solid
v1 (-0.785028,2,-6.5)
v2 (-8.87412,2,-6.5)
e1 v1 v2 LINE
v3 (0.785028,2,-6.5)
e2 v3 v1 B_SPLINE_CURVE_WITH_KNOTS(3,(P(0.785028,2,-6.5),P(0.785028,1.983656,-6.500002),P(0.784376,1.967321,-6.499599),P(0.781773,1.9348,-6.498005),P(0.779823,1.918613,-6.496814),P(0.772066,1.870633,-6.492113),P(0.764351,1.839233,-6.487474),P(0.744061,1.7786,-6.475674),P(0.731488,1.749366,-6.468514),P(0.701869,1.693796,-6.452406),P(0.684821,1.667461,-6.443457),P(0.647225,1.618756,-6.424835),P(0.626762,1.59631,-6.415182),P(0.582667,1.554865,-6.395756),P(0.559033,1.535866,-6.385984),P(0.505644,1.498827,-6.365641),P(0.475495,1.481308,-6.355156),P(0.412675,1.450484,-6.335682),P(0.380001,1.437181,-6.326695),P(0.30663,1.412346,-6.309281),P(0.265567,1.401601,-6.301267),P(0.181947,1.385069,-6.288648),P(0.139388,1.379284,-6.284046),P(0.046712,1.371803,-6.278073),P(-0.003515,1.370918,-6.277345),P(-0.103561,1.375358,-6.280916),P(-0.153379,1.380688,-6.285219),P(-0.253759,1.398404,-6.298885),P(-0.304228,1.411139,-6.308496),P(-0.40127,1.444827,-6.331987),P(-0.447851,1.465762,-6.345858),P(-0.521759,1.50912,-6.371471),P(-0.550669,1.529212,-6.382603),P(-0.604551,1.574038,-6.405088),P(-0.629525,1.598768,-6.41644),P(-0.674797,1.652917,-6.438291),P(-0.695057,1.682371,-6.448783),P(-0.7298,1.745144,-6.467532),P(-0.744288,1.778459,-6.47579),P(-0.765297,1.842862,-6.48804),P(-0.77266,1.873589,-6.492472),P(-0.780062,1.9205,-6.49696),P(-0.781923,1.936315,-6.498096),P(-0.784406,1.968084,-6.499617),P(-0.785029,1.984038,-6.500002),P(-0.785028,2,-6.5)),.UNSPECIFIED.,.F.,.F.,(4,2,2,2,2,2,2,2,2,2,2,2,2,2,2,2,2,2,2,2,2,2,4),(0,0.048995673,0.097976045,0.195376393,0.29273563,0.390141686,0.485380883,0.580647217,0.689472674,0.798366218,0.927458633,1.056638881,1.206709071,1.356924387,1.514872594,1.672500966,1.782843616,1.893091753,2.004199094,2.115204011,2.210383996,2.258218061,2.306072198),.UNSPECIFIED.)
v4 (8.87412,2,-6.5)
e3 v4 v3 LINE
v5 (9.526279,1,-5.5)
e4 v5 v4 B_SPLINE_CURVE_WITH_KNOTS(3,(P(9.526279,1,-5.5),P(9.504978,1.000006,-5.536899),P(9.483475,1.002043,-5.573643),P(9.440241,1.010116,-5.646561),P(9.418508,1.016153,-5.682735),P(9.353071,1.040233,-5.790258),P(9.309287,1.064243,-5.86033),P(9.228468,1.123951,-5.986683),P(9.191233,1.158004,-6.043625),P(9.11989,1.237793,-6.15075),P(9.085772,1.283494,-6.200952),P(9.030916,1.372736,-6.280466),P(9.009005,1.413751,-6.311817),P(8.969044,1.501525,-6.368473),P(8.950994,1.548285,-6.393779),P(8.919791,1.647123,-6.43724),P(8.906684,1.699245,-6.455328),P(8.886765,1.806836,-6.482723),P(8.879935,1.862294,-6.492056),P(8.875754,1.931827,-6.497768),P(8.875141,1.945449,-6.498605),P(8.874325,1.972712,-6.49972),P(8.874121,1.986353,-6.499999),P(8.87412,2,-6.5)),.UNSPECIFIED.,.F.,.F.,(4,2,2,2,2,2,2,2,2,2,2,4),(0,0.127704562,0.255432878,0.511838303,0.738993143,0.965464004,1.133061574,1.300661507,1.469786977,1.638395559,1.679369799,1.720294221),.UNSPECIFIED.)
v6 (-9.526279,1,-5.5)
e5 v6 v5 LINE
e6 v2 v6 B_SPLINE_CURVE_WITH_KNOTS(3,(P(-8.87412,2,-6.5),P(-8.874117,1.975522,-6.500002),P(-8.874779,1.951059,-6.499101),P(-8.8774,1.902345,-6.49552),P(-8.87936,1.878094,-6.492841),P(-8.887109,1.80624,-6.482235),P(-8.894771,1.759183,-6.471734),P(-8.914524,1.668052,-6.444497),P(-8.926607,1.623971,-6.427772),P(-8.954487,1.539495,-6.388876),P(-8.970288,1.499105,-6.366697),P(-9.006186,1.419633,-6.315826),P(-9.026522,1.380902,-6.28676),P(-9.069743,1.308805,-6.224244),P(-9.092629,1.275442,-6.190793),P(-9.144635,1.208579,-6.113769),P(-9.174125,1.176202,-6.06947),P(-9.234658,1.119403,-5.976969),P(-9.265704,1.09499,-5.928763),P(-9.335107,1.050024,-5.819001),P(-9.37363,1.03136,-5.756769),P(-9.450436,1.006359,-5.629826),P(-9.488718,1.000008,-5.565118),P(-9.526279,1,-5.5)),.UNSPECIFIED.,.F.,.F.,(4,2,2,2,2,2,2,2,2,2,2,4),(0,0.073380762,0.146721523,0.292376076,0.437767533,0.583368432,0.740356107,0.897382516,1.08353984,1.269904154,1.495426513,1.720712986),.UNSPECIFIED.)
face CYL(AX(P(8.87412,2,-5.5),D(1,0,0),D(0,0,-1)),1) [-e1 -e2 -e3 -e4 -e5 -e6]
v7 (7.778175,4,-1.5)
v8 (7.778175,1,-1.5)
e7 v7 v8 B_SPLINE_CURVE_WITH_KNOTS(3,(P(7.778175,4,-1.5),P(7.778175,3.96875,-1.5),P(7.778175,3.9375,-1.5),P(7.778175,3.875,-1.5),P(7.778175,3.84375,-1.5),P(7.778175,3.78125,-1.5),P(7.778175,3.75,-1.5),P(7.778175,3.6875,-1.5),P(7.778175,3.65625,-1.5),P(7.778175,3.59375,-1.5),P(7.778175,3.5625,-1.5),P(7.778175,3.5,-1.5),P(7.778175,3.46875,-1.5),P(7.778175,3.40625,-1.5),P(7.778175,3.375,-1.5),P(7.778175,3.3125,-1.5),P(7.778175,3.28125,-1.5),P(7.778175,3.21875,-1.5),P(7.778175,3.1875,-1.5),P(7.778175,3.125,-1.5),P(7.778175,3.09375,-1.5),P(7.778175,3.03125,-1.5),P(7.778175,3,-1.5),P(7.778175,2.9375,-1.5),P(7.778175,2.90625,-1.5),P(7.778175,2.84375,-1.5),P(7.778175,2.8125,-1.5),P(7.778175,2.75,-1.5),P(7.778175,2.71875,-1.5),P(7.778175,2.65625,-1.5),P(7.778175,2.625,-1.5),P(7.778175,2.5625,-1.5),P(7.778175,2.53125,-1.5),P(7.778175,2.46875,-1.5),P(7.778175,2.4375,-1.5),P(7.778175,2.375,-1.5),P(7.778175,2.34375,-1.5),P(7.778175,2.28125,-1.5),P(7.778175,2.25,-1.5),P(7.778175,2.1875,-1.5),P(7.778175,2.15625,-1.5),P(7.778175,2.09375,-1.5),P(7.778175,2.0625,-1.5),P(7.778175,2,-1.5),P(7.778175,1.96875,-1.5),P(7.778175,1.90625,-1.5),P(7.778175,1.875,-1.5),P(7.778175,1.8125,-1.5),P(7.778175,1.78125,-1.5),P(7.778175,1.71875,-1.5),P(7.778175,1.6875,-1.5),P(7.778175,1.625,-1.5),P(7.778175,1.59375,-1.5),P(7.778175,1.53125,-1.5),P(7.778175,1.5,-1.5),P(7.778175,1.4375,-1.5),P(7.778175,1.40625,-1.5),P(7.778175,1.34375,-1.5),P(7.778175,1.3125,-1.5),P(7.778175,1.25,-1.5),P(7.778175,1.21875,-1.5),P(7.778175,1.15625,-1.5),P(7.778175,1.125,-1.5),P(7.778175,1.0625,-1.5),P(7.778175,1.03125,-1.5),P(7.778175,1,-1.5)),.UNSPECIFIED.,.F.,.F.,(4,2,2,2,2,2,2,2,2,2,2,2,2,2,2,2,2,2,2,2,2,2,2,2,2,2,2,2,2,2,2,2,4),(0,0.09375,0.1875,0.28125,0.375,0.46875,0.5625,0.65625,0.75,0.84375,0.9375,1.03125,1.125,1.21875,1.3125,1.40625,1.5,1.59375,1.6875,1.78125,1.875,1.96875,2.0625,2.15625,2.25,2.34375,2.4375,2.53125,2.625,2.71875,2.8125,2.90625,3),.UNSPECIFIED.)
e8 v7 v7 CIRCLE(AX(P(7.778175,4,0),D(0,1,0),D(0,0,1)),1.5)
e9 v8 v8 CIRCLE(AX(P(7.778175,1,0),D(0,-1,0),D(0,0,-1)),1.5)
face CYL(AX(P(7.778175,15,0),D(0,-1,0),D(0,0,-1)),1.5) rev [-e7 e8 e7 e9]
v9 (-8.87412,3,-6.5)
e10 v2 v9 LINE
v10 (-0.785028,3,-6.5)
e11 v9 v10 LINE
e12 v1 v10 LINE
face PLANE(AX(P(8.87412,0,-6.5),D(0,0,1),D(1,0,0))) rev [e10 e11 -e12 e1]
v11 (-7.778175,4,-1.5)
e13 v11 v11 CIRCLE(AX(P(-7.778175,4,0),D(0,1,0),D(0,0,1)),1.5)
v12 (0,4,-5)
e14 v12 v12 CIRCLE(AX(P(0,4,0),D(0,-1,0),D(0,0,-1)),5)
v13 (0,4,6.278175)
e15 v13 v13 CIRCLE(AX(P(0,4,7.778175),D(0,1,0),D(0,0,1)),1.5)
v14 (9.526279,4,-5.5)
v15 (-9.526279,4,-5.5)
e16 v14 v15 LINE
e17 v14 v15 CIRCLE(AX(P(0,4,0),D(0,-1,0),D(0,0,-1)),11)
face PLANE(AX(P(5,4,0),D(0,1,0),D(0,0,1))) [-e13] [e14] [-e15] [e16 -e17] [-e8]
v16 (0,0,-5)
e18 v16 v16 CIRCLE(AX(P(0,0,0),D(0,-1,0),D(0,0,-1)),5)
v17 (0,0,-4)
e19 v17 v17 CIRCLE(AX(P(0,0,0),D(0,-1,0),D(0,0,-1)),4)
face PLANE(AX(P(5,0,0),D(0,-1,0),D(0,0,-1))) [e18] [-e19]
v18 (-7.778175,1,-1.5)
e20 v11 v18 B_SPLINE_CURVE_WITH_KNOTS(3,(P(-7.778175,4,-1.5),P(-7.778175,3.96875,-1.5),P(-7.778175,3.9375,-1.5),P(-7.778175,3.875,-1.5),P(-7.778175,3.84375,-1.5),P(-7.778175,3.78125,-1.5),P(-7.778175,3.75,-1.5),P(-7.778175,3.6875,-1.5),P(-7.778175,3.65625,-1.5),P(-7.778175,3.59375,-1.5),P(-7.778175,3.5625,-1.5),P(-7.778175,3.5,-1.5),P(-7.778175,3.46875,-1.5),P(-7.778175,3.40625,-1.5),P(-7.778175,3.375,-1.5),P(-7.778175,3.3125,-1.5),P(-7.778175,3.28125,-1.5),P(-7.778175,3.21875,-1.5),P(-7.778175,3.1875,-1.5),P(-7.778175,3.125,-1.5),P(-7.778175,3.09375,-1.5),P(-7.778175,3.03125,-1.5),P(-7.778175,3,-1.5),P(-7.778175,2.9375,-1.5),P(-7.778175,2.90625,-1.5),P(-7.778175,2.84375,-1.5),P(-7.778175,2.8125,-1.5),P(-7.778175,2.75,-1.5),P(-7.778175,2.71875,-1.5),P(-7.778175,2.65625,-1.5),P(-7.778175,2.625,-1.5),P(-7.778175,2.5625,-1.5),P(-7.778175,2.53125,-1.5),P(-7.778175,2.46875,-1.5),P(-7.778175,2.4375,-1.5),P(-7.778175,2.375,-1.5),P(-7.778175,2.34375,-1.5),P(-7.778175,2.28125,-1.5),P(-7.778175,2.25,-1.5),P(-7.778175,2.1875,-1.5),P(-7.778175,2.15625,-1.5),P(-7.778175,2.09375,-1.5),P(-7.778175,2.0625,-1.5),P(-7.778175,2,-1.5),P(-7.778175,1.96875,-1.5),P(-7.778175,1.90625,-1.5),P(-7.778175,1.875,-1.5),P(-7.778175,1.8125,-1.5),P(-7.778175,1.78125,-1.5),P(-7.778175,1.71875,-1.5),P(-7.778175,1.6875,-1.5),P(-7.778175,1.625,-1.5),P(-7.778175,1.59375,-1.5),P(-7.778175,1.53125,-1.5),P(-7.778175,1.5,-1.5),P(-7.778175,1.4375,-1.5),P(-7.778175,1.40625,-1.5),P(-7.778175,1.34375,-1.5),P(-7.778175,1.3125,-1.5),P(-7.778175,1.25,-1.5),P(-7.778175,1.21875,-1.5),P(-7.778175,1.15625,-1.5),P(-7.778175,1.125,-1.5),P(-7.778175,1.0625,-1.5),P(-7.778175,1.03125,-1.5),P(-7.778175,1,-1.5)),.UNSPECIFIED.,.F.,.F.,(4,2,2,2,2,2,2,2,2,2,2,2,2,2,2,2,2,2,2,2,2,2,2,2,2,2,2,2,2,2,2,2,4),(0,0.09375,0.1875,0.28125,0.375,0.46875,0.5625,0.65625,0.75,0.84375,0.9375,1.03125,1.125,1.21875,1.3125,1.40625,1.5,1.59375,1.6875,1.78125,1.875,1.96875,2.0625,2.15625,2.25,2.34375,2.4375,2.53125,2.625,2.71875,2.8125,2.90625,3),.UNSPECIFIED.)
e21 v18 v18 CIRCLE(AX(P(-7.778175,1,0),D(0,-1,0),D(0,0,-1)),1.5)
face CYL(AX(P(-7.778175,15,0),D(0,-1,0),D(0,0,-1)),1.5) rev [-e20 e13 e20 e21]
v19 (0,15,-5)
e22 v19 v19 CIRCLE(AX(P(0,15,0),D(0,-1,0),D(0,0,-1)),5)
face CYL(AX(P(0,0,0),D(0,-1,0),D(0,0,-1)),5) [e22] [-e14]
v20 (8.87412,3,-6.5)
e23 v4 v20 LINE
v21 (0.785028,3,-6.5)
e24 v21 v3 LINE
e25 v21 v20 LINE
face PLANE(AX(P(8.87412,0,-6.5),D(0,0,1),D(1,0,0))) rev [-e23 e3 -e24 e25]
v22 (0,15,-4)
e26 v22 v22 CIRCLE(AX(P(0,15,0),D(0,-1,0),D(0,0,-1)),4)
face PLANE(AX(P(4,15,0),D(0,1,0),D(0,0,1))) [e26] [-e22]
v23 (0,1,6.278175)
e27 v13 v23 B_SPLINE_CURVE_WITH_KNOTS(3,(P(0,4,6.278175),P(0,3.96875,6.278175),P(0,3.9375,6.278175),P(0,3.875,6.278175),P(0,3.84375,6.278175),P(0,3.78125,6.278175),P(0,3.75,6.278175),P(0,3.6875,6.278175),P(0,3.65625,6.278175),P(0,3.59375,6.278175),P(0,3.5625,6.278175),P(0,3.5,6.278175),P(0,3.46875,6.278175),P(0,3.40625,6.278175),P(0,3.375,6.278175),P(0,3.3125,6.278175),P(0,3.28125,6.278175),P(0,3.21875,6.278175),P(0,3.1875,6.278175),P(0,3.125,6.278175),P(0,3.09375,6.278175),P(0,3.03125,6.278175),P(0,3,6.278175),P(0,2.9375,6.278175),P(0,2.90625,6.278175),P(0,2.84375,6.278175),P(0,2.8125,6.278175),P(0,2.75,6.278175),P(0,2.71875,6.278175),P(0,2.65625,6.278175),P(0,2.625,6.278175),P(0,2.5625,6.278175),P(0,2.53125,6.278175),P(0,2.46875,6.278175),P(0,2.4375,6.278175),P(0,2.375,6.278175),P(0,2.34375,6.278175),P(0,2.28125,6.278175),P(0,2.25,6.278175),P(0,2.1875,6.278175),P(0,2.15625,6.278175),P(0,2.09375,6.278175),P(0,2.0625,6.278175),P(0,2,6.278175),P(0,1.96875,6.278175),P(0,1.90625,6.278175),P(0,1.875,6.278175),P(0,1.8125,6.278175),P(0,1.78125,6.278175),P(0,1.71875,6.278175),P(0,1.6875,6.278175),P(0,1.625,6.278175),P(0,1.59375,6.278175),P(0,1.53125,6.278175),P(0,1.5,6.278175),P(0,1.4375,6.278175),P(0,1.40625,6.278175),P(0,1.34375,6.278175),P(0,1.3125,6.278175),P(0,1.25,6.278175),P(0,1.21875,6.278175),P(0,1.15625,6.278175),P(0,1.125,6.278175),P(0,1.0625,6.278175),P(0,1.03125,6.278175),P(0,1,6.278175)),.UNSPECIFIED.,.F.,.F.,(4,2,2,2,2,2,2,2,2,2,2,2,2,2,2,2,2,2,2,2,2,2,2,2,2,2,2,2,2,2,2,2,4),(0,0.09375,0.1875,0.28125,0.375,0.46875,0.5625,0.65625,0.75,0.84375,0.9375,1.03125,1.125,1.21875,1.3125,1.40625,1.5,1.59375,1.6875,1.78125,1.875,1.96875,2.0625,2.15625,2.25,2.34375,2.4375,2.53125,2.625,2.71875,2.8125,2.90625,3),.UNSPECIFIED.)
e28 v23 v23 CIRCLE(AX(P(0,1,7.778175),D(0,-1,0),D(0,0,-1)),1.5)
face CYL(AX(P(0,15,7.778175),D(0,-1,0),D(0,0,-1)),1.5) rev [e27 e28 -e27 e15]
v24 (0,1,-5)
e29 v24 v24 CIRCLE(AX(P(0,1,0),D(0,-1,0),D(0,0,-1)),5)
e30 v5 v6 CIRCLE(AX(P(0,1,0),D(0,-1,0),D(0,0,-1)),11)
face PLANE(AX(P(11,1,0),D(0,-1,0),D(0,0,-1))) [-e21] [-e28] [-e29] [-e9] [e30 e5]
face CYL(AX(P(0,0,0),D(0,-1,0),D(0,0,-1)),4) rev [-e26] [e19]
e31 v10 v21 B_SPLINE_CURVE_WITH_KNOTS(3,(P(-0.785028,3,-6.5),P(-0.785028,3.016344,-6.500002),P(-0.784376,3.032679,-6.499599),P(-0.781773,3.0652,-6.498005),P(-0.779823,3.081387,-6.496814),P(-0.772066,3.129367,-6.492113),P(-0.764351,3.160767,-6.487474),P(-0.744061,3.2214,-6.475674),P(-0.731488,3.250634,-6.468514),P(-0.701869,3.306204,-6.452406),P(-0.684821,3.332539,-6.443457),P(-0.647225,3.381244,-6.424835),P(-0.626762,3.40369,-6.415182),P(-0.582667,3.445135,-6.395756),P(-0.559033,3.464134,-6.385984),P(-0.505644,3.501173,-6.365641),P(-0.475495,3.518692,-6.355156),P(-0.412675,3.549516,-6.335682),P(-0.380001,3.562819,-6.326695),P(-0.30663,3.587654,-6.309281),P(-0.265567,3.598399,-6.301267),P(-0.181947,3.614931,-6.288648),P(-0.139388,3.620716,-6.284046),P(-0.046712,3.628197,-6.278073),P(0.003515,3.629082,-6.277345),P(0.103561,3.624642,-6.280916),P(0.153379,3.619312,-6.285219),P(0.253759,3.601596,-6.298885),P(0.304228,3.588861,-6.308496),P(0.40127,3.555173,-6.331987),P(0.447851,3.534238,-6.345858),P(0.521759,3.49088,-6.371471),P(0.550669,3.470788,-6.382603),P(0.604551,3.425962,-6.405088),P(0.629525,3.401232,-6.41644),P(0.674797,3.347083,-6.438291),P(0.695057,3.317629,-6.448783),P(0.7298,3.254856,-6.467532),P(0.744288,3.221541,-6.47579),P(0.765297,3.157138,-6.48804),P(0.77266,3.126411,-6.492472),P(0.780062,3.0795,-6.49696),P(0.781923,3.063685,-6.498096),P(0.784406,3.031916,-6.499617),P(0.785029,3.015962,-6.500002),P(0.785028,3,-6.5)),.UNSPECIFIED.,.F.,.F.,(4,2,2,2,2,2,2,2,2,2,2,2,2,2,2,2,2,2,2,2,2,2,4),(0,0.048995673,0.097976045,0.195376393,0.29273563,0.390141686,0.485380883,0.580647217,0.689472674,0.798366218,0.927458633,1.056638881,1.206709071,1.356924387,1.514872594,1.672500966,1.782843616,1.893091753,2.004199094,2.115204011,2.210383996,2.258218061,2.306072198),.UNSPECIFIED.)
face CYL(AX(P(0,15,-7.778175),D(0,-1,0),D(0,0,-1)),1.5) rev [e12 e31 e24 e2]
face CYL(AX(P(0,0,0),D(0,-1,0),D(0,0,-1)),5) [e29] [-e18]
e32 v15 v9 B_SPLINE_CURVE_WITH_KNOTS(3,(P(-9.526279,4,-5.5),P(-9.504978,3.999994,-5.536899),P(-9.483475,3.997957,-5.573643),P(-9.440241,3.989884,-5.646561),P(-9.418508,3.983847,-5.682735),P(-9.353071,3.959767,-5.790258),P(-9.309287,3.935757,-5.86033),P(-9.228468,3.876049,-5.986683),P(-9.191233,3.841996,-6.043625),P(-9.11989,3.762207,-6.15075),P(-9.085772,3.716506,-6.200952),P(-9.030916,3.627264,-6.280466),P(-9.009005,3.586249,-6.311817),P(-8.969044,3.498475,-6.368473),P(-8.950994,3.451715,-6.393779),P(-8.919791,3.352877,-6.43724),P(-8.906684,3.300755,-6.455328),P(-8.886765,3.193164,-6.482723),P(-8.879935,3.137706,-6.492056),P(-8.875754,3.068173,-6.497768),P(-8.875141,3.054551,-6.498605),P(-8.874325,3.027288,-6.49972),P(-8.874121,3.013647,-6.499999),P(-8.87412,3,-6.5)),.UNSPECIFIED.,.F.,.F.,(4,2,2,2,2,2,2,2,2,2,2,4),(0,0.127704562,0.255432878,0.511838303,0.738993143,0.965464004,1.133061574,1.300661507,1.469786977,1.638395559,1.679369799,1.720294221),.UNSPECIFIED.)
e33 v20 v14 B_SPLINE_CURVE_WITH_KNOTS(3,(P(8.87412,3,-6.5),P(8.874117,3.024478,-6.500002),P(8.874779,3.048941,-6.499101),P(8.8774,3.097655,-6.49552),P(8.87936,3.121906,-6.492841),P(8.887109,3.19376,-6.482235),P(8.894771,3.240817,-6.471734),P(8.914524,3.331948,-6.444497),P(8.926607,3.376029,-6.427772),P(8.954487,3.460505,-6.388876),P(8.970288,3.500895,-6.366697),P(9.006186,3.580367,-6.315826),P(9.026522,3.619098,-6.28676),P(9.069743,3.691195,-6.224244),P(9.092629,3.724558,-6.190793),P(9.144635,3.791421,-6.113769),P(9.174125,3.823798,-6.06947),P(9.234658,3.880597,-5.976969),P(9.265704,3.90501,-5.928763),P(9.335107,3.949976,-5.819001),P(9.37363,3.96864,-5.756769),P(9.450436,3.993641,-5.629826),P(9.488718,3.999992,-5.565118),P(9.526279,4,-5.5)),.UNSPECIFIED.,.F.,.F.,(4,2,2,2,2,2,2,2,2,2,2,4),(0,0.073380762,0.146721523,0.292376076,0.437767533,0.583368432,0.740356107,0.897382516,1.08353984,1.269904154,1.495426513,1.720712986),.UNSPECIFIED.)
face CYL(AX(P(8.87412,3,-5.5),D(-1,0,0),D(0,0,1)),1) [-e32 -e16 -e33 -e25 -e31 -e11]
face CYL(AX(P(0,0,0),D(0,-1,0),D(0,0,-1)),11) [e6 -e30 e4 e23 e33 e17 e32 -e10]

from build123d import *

# Parameters (mm, degrees)
ESQUISSE2_R             = 1.5
ENL_V_MAT_EXTRU_1_DEPTH = 21.928449536
ESQUISSE3_W             = 17.74823935
ESQUISSE3_H             = 7.774498086
ENL_V_MAT_EXTRU_2_DEPTH = 20.052558883
CONG_1_R                = 1


with BuildPart() as part:
    # Esquisse1 → Révolution1 (revolve)
    with BuildSketch(Plane.XY):
        Polygon((4, 0), (4, 15), (5, 15), (5, 4), (11, 4), (11, 1), (5, 1), (5, 0), align=None)
    revolve(axis=Axis((0, 0, 0), (0, 1, 0)))

    # Esquisse2 → Enlèv. mat.-Extru.1 (cut, through all)
    with BuildSketch(Plane.XZ.offset(-1)):
        with Locations((7.778174593, 0)):
            Circle(ESQUISSE2_R)
        with Locations((0, -7.778174593)):
            Circle(ESQUISSE2_R)
        with Locations((-7.778174593, 0)):
            Circle(ESQUISSE2_R)
        with Locations((0, 7.778174593)):
            Circle(ESQUISSE2_R)
    extrude(amount=-ENL_V_MAT_EXTRU_1_DEPTH, mode=Mode.SUBTRACT)

    # Esquisse3 → Enlèv. mat.-Extru.2 (cut, through all)
    with BuildSketch(Plane(origin=(0, 4, 0), x_dir=(1, 0, 0), z_dir=(0, 1, 0))):
        with Locations((0, 10.387249043)):
            Rectangle(ESQUISSE3_W, ESQUISSE3_H)
    extrude(amount=-ENL_V_MAT_EXTRU_2_DEPTH, mode=Mode.SUBTRACT)

    # Congé1
    cong_1_edges = [part.edges().sort_by_distance(p)[0] for p in [
        (-4.829574076, 1, -6.5),
        (-4.829574076, 4, -6.5),
    ]]
    fillet(cong_1_edges, radius=CONG_1_R)


solid = part.part
